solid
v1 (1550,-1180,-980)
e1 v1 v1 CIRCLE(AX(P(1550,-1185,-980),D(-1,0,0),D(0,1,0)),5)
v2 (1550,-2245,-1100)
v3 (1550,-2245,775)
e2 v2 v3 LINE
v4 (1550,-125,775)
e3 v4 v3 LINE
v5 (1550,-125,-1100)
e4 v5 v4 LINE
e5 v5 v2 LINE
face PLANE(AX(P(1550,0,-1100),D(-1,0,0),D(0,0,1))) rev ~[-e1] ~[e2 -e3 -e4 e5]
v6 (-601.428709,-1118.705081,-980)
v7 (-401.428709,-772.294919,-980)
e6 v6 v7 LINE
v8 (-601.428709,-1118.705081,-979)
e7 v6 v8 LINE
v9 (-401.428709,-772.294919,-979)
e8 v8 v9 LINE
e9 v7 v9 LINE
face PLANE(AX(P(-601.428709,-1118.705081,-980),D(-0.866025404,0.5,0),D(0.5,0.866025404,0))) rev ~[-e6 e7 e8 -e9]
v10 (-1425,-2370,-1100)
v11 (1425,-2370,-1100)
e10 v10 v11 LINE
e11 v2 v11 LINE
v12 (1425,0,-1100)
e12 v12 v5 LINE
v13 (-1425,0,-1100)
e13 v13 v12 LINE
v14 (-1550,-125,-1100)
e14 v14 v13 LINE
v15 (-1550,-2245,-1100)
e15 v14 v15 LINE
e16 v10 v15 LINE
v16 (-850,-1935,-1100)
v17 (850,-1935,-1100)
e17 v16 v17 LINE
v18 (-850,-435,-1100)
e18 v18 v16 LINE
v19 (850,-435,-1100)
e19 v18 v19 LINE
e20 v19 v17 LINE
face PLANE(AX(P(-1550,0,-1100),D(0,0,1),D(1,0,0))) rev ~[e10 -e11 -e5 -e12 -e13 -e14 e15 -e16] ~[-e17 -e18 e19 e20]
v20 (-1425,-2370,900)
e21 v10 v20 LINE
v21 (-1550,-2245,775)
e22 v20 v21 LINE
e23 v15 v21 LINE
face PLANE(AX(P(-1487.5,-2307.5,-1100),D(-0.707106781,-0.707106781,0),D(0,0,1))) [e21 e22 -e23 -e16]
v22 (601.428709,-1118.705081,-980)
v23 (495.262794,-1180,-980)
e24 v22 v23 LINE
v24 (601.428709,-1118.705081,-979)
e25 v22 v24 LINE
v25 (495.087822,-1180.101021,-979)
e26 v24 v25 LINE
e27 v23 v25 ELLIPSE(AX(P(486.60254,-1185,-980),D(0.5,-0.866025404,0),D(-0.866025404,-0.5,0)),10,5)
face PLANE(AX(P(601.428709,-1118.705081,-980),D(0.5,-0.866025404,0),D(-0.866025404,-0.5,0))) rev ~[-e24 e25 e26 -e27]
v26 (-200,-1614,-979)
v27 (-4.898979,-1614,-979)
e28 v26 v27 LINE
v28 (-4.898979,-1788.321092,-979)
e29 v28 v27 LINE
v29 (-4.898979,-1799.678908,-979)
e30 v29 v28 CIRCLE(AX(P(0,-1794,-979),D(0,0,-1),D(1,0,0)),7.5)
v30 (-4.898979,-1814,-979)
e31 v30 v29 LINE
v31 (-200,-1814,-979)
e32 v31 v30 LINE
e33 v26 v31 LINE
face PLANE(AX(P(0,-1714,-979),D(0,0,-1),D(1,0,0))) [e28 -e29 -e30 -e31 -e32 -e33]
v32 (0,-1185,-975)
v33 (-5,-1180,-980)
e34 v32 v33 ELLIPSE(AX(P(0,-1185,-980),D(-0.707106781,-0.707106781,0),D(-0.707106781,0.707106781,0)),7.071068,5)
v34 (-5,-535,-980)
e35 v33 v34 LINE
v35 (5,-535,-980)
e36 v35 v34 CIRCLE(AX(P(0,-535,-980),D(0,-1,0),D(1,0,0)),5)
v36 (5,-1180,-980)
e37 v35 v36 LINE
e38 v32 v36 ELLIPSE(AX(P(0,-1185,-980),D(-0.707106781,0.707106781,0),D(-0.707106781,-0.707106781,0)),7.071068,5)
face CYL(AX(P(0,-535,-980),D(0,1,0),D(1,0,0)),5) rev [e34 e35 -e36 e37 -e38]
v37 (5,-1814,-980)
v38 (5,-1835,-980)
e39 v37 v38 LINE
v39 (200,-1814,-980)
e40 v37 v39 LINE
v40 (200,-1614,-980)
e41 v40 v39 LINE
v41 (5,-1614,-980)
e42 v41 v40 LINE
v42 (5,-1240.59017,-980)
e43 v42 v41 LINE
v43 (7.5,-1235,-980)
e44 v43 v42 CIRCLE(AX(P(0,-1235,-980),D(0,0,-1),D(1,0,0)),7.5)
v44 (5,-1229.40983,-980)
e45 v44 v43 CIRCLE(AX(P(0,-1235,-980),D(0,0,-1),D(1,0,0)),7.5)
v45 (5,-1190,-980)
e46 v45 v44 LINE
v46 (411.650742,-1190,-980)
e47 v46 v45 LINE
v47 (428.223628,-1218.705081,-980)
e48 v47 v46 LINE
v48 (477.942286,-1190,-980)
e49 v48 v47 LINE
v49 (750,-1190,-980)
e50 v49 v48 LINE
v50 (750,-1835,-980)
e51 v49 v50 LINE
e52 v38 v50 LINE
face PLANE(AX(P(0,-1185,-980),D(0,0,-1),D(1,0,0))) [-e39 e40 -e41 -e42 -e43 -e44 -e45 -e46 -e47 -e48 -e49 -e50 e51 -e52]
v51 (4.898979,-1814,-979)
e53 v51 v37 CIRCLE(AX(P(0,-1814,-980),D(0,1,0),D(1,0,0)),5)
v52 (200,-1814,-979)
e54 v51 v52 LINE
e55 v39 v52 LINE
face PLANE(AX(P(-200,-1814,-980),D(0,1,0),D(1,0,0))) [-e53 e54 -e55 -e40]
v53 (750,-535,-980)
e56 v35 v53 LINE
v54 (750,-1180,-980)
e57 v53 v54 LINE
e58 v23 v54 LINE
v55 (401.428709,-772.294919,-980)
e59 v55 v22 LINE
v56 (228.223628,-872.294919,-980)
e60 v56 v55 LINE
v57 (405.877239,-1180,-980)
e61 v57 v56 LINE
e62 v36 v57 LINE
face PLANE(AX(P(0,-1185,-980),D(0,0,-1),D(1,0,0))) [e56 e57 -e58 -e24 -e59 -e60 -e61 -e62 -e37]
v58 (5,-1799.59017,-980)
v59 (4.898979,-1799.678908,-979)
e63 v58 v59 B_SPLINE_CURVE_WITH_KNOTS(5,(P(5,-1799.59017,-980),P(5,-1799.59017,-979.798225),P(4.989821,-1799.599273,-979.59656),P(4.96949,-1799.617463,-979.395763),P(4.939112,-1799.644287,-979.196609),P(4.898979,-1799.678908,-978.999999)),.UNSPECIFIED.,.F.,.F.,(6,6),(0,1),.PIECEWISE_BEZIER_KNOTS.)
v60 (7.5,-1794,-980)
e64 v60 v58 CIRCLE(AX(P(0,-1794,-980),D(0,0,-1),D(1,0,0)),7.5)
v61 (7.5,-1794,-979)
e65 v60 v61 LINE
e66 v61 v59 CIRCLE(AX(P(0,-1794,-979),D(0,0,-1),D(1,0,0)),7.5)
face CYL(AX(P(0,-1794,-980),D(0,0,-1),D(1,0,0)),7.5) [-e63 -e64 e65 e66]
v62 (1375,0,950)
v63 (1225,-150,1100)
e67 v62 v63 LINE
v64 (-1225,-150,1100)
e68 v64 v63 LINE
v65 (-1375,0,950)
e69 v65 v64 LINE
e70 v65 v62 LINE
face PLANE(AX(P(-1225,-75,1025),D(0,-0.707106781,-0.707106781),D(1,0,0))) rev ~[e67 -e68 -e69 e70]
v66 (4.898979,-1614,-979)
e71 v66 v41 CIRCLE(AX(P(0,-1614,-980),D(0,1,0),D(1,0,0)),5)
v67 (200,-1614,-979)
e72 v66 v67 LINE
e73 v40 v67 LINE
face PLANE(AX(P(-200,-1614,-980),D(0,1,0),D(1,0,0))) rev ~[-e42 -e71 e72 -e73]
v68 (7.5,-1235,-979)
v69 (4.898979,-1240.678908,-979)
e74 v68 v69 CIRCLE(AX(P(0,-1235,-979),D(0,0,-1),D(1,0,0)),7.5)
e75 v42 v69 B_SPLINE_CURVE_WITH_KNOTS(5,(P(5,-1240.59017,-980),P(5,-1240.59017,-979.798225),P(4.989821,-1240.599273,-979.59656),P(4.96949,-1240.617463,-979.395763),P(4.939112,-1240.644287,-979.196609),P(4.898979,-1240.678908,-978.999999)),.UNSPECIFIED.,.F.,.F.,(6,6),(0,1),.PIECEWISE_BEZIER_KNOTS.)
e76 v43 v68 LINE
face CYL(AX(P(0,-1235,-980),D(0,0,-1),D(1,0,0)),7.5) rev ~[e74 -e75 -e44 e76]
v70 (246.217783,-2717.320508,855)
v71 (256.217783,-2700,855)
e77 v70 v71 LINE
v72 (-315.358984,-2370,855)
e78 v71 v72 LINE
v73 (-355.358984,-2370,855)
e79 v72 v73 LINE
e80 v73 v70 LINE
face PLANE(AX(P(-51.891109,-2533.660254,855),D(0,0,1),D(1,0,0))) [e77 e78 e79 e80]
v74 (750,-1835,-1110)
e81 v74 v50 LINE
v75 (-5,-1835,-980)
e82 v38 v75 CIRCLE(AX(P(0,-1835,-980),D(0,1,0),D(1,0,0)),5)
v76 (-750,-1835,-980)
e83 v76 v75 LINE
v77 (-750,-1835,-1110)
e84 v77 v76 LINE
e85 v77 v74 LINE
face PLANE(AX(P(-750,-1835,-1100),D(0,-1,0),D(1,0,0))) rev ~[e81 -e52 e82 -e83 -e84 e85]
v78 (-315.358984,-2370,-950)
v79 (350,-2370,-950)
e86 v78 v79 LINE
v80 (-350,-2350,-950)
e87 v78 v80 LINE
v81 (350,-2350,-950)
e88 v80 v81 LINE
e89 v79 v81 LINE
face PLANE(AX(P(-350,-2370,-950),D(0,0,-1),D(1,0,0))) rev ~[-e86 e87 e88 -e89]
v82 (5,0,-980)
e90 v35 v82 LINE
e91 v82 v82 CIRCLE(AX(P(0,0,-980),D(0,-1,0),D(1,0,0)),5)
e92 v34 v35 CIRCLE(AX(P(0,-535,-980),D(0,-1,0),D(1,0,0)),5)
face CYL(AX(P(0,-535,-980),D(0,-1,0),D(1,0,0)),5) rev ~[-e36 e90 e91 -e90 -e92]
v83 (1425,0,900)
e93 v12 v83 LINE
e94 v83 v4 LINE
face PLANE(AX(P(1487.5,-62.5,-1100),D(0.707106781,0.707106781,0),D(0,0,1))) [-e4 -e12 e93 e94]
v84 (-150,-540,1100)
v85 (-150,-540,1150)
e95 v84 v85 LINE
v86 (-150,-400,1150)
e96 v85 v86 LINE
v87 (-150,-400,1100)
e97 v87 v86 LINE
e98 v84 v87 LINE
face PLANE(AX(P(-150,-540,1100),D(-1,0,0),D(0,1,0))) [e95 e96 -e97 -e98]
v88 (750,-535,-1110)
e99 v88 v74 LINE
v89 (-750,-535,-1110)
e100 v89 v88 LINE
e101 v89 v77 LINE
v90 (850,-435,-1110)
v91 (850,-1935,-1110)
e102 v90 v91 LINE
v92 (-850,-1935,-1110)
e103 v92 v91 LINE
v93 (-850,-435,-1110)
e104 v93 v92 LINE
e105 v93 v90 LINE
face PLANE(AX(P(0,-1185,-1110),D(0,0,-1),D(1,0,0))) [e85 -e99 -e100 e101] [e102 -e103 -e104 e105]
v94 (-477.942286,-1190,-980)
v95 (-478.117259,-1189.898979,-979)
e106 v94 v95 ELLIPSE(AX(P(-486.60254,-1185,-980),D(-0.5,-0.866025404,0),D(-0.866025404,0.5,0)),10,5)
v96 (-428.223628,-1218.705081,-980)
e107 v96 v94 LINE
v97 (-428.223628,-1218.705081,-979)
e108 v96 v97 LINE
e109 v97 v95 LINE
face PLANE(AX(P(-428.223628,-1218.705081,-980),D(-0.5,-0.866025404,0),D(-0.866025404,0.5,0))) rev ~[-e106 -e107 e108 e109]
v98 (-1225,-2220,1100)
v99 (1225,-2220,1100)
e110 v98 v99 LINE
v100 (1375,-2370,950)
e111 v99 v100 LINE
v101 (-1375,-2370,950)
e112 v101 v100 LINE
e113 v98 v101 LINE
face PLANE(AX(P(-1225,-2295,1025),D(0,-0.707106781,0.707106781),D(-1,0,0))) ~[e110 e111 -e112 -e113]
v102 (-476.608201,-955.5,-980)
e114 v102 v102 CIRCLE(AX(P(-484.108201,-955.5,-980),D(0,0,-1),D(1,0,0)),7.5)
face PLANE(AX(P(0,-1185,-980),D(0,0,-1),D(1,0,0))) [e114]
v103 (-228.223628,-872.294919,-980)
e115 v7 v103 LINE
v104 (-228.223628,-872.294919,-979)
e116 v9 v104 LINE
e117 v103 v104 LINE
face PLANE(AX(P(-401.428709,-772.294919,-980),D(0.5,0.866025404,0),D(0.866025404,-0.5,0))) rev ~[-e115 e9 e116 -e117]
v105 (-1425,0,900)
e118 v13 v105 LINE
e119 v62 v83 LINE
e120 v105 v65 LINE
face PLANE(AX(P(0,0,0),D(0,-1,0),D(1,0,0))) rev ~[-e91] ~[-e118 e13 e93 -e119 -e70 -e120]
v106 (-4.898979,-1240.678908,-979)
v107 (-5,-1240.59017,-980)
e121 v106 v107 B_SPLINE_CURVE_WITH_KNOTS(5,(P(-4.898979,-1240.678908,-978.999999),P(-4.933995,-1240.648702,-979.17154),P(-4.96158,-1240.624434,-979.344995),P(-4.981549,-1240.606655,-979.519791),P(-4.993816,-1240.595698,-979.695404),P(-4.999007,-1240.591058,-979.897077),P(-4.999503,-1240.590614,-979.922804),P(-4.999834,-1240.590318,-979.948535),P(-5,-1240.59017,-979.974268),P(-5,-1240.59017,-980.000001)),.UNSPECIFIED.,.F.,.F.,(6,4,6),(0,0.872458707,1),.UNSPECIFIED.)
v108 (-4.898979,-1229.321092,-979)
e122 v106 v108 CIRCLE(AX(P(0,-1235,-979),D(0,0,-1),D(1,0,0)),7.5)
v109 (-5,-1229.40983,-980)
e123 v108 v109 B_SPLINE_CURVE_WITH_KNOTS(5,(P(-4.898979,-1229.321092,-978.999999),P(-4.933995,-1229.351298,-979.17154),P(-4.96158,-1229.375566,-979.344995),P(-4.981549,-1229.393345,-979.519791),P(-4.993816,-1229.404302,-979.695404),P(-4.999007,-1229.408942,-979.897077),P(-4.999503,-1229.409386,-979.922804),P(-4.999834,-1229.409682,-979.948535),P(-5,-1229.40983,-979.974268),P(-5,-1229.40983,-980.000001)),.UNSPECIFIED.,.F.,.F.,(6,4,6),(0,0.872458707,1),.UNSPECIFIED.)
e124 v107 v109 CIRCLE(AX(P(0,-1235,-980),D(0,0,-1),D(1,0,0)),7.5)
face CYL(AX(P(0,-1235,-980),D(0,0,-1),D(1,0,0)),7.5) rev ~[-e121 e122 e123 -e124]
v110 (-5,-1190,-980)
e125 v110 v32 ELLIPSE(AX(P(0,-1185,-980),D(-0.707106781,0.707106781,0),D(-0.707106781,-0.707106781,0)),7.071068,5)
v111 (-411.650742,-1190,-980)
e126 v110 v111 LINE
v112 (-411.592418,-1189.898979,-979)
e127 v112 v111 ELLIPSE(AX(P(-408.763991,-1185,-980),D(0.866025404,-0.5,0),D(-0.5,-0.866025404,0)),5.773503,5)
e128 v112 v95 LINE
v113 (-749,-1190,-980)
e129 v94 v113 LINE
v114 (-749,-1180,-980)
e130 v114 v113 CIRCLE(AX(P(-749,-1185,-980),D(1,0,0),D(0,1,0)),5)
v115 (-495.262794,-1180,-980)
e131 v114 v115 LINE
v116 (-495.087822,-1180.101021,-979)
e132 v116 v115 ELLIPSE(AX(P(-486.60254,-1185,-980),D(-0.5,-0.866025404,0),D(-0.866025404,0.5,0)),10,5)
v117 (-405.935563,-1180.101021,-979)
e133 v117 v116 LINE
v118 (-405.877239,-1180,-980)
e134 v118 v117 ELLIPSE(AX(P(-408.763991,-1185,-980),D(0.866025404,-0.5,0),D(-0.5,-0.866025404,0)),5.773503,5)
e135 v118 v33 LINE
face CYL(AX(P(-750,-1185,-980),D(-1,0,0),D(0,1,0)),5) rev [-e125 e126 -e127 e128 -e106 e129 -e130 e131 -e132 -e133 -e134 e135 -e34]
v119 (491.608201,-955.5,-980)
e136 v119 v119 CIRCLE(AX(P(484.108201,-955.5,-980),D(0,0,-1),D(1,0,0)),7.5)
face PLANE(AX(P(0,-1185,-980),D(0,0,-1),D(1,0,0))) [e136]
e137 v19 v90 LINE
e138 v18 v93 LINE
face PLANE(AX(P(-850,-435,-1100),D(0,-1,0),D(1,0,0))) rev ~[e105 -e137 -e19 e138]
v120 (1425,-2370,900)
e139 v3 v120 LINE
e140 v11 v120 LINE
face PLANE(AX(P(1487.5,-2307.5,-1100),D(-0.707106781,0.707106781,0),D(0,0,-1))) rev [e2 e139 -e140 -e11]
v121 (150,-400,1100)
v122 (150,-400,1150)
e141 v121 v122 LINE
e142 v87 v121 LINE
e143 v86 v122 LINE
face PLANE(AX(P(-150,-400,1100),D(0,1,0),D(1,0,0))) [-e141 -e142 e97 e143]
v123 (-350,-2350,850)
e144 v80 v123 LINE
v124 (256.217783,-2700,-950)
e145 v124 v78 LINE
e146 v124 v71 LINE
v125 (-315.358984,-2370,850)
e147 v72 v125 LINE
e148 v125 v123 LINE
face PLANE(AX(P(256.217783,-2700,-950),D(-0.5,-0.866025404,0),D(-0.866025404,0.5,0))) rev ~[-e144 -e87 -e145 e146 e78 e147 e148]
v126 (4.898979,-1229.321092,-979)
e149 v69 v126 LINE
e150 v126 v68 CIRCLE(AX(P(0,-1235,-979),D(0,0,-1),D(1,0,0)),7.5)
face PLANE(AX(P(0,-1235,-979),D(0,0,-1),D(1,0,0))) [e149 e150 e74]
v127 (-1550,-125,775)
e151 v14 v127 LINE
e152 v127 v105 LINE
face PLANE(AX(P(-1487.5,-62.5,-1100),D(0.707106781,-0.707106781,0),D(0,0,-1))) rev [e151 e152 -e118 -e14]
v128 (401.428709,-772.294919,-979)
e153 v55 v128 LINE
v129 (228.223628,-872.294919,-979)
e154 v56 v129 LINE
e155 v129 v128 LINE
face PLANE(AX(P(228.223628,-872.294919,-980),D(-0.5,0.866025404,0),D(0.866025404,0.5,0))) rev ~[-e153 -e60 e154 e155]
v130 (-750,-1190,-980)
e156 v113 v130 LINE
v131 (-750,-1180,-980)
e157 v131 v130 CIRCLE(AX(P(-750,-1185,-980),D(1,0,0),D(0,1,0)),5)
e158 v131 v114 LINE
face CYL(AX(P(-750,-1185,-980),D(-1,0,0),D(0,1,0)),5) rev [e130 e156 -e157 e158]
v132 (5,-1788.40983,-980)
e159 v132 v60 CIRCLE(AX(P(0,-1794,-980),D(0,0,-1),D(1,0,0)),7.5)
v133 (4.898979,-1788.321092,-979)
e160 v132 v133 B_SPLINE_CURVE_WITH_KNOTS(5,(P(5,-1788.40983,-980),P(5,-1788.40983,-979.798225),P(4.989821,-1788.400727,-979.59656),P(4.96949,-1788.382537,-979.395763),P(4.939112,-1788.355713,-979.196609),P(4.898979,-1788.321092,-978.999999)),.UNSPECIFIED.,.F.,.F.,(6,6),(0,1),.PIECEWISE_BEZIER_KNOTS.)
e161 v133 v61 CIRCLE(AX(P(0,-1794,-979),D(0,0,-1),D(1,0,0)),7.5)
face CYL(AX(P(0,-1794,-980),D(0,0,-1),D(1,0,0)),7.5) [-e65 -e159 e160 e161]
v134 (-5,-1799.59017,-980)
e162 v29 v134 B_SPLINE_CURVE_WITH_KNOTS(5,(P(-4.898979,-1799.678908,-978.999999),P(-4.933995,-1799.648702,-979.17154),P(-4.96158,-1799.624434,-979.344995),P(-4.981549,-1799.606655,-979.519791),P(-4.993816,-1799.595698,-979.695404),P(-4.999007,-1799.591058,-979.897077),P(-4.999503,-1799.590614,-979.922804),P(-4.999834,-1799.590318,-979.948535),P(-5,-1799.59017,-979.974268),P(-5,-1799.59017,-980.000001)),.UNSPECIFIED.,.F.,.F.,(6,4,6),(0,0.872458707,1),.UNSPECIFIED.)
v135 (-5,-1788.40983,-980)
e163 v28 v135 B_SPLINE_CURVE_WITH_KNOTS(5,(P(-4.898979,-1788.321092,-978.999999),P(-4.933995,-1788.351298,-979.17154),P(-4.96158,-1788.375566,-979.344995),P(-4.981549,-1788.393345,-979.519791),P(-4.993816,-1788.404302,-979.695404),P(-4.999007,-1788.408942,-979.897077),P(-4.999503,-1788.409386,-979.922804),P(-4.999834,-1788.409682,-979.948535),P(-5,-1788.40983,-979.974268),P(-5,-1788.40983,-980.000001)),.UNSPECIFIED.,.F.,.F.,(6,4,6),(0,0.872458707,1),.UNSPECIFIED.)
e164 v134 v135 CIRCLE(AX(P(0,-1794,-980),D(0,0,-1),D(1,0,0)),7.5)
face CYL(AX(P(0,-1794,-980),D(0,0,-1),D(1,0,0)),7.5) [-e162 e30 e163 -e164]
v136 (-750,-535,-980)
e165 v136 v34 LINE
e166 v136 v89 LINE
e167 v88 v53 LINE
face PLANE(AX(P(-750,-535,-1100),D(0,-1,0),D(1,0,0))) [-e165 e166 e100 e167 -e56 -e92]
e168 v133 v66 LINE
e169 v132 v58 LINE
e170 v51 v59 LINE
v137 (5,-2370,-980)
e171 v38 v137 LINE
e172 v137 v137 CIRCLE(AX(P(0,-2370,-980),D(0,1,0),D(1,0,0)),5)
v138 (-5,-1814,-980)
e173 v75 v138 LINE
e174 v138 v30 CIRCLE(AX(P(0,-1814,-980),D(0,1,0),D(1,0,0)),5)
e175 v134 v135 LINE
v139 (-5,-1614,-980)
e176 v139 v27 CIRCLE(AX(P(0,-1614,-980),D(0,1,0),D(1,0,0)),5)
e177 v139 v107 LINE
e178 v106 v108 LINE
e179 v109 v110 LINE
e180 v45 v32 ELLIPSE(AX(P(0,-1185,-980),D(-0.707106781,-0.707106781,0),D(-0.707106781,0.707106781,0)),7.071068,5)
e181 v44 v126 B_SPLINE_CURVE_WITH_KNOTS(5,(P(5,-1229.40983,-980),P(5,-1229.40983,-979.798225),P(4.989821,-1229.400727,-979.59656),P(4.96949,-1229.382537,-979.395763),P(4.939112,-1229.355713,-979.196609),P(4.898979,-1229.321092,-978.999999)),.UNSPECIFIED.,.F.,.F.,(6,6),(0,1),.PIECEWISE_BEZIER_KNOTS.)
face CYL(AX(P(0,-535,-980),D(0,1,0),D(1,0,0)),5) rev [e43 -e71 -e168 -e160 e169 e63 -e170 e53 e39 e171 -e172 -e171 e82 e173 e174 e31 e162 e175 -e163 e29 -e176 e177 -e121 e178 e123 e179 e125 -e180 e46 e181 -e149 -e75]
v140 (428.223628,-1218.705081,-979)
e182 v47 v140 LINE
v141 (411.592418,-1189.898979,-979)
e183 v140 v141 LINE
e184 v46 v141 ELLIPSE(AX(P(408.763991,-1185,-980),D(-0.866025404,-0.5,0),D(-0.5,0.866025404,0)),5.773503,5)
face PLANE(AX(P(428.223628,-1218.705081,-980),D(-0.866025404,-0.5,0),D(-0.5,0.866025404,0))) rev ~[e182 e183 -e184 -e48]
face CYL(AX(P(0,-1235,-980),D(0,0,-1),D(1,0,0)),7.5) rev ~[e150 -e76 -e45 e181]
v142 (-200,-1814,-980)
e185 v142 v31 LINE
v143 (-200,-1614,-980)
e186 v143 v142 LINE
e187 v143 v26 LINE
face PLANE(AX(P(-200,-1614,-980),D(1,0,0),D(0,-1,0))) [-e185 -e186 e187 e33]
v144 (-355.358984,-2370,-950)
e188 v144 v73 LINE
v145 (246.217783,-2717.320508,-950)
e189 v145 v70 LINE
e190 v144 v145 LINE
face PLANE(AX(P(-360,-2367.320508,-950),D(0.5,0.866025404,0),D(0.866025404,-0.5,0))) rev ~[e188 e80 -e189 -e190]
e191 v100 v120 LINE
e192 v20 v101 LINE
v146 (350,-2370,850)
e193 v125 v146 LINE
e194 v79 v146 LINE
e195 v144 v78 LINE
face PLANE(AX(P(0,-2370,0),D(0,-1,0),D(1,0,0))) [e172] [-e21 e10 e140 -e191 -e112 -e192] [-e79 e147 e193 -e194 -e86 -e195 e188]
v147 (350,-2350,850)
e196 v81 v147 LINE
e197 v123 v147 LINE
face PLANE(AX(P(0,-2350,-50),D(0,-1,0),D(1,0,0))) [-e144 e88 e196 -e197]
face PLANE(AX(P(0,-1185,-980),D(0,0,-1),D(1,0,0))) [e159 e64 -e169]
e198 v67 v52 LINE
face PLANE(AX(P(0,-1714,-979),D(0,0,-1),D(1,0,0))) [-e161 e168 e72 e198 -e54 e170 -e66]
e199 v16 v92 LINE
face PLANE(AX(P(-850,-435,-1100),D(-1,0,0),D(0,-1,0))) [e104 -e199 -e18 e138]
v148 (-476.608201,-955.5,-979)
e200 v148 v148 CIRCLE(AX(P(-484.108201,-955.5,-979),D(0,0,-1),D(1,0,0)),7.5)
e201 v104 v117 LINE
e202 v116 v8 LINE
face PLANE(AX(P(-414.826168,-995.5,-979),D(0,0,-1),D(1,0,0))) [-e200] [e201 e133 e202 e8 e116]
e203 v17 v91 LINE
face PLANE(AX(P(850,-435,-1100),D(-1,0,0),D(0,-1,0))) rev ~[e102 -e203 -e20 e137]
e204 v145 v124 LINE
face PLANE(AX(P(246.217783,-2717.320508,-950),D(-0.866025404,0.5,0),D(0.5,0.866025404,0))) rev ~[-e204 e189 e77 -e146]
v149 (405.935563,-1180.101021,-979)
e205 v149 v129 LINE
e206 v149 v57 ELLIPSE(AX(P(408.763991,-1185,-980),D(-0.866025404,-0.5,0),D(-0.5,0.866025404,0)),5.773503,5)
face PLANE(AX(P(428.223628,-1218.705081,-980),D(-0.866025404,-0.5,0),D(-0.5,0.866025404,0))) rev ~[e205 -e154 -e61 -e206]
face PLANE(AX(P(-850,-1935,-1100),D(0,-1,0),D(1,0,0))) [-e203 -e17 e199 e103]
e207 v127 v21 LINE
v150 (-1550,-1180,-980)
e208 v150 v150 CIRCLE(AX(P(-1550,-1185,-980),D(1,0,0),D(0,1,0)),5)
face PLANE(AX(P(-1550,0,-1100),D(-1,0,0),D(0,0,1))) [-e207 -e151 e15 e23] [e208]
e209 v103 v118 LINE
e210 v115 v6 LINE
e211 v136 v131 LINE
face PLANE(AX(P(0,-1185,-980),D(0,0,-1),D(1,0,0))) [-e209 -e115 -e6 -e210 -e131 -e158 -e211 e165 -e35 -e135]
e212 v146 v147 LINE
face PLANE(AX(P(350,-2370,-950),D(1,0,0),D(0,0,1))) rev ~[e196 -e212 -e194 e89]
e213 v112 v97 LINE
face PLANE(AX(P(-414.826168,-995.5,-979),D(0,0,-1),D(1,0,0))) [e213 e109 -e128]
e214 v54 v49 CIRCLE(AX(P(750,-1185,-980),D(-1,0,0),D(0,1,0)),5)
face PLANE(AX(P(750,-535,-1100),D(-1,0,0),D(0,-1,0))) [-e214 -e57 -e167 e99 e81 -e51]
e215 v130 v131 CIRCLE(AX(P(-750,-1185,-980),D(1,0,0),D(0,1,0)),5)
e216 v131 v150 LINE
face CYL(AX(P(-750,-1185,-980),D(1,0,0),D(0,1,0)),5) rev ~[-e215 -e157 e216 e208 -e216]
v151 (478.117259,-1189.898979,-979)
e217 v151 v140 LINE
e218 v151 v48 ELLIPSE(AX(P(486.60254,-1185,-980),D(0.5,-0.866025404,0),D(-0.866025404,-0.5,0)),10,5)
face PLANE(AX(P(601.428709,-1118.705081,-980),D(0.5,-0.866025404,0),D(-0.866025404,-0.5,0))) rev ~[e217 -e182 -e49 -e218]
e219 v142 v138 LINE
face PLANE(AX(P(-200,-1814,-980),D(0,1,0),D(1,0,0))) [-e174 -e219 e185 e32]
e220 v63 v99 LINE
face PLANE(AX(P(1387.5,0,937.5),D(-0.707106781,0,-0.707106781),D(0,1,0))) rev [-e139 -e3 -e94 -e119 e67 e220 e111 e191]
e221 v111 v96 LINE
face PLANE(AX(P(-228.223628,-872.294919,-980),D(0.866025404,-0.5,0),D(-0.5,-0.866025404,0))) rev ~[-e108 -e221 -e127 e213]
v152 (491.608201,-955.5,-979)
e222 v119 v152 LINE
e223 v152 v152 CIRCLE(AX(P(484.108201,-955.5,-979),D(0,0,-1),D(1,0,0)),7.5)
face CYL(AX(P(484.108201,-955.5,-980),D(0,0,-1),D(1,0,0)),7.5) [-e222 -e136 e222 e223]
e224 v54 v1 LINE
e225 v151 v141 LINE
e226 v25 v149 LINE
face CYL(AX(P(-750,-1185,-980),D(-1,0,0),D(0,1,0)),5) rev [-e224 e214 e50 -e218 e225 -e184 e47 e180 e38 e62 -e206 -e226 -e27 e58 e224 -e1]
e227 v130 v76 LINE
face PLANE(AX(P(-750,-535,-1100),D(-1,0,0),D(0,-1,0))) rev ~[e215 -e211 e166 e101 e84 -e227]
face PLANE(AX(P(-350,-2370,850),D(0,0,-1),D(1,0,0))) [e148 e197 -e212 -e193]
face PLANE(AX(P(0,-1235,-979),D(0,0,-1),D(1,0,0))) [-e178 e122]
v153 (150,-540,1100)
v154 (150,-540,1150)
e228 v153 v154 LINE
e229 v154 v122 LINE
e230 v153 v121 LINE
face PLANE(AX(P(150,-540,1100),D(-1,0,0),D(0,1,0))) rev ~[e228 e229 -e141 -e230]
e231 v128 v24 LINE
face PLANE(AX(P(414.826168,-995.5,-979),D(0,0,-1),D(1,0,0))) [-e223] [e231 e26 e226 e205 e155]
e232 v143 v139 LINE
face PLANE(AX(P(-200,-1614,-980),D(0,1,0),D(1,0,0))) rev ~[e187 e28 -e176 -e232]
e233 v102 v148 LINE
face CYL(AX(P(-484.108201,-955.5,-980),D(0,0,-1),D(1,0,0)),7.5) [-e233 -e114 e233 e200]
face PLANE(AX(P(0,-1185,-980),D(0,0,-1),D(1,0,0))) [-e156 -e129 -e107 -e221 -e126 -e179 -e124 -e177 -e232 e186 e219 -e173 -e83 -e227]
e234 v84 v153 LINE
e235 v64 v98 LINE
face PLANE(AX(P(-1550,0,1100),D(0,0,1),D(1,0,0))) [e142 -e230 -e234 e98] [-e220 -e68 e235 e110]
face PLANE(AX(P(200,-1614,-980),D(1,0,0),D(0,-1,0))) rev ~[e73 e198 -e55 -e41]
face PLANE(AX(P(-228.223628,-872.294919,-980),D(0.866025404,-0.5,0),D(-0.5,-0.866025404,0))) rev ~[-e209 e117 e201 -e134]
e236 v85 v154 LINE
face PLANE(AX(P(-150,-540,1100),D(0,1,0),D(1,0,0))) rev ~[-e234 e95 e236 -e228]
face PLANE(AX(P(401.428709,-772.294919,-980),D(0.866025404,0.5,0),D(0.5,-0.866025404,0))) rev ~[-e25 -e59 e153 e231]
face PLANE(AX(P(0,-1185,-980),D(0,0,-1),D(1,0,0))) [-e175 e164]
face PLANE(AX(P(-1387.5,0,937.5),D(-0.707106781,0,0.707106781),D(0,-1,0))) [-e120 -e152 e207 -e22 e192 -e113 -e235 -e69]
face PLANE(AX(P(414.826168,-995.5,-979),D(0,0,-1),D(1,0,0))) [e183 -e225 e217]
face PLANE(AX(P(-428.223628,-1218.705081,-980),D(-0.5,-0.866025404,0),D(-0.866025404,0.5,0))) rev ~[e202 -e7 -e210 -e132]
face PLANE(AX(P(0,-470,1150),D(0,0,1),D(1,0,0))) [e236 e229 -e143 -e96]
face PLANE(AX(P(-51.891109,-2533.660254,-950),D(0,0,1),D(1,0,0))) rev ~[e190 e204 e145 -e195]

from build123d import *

# Parameters (mm, degrees)
F0_W           = 3100
F0_H           = 2200
F1_DEPTH       = 2370
F2_SIZE        = 325
F3_SIZE        = 325
F4_SIZE        = 125
F5_SIZE        = 125
F6_SIZE        = 125
F7_SIZE        = 125
F8_W           = 1500
F8_H           = 1300
F9_DEPTH       = 120
F10_W          = 400
F10_H          = 200
F10_R          = 7.5
F11_DEPTH      = 1
F12_R          = 5
F13_DEPTH      = 1
F14_DEPTH      = 800.001
F14_DEPTH_BACK = 2300.001
F15_R          = 5
F16_DEPTH      = 535.001
F16_DEPTH_BACK = 1835.001
F17_SIZE       = 150
F18_SIZE       = 150
F19_W          = 1700
F19_H          = 1500
F19_W_2        = 1500
F19_H_2        = 1300
F20_DEPTH      = 10
F21_W          = 700
F21_H          = 1800
F22_DEPTH      = 20
F23_W          = 300
F23_H          = 140
F24_DEPTH      = 50
F26_DEPTH      = 1805


# Not quite as in the source:
# - a feature of the source that left no trace in its solid (it failed there, or was rolled back) is left out


with BuildPart() as f1:
    # F0 (on Front) → F1 (new body)
    with BuildSketch(Plane.XZ):
        Rectangle(F0_W, F0_H)
    extrude(amount=F1_DEPTH)

    # F2
    f2_edges = [f1.edges().sort_by_distance(p)[0] for p in [
        (-1550, -1185, 1100),
    ]]
    chamfer(f2_edges, length=F2_SIZE)

    # F3
    f3_edges = [f1.edges().sort_by_distance(p)[0] for p in [
        (1550, -1185, 1100),
    ]]
    chamfer(f3_edges, length=F3_SIZE)

    # F4
    f4_edges = [f1.edges().sort_by_distance(p)[0] for p in [
        (1550, -2370, -162.5),
    ]]
    chamfer(f4_edges, length=F4_SIZE)

    # F5
    f5_edges = [f1.edges().sort_by_distance(p)[0] for p in [
        (-1550, -2370, -162.5),
    ]]
    chamfer(f5_edges, length=F5_SIZE)

    # F6
    f6_edges = [f1.edges().sort_by_distance(p)[0] for p in [
        (-1550, 0, -162.5),
    ]]
    chamfer(f6_edges, length=F6_SIZE)

    # F7
    f7_edges = [f1.edges().sort_by_distance(p)[0] for p in [
        (1550, 0, -162.5),
    ]]
    chamfer(f7_edges, length=F7_SIZE)

    # F8 (on face) → F9 (cut)
    with BuildSketch(Plane(origin=(0, 0, -1100), x_dir=(1, 0, 0), z_dir=(0, 0, -1))):
        with Locations((0, 1185)):
            Rectangle(F8_W, F8_H)
    extrude(amount=-F9_DEPTH, mode=Mode.SUBTRACT)

    # F10 (on face) → F11 (cut)
    with BuildSketch(Plane(origin=(0, 0, -980), x_dir=(1, 0, 0), z_dir=(0, 0, -1))):
        with Locations((0, 1714)):
            Rectangle(F10_W, F10_H)
        with Locations((0, 1794)):
            Circle(F10_R, mode=Mode.SUBTRACT)
        Polygon((601.4287087912, 1118.7050807569), (428.2236280343, 1218.7050807569), (228.2236280343, 872.2949192431), (401.4287087912, 772.2949192431), align=None)
        with Locations((484.1082007155, 955.5)):
            Circle(F10_R, mode=Mode.SUBTRACT)
        Polygon((-228.2236280343, 872.2949192431), (-428.2236280343, 1218.7050807569), (-601.4287087912, 1118.7050807569), (-401.4287087912, 772.2949192431), align=None)
        with Locations((-484.1082007155, 955.5)):
            Circle(F10_R, mode=Mode.SUBTRACT)
        with Locations((0, 1235)):
            Circle(F10_R)
    extrude(amount=-F11_DEPTH, mode=Mode.SUBTRACT)

    # F12 (on face) → F13 (cut)
    with BuildSketch(Plane.YZ.offset(-750)):
        with Locations((-1185, -980)):
            Circle(F12_R)
    extrude(amount=F13_DEPTH, mode=Mode.SUBTRACT)

    # F12 (on face) → F14 (cut, two sides)
    with BuildSketch(Plane.YZ.offset(-750)) as f14_sk:
        with Locations((-1185, -980)):
            Circle(F12_R)
    extrude(amount=-F14_DEPTH, mode=Mode.SUBTRACT)
    extrude(f14_sk.sketch, amount=F14_DEPTH_BACK, mode=Mode.SUBTRACT)

    # F15 (on face) → F16 (cut, two sides)
    with BuildSketch(Plane.XZ.offset(535)) as f16_sk:
        with Locations((0, -980)):
            Circle(F15_R)
    extrude(amount=-F16_DEPTH, mode=Mode.SUBTRACT)
    extrude(f16_sk.sketch, amount=F16_DEPTH_BACK, mode=Mode.SUBTRACT)

    # F17
    f17_edges = [f1.edges().sort_by_distance(p)[0] for p in [
        (0, 0, 1100),
    ]]
    chamfer(f17_edges, length=F17_SIZE)

    # F18
    f18_edges = [f1.edges().sort_by_distance(p)[0] for p in [
        (0, -2370, 1100),
    ]]
    chamfer(f18_edges, length=F18_SIZE)

    # F19 (on face) → F20 (join)
    with BuildSketch(Plane(origin=(0, 0, -1100), x_dir=(1, 0, 0), z_dir=(0, 0, -1))):
        with Locations((0, 1185)):
            Rectangle(F19_W, F19_H)
        with Locations((0, 1185)):
            Rectangle(F19_W_2, F19_H_2, mode=Mode.SUBTRACT)
    extrude(amount=F20_DEPTH)

    # F21 (on face) → F22 (cut)
    with BuildSketch(Plane.XZ.offset(2370)):
        with Locations((0, -50)):
            Rectangle(F21_W, F21_H)
    extrude(amount=-F22_DEPTH, mode=Mode.SUBTRACT)

    # F23 (on face) → F24 (join)
    with BuildSketch(Plane.XY.offset(1100)):
        with Locations((0, -470)):
            Rectangle(F23_W, F23_H)
    extrude(amount=F24_DEPTH)

    # F25 (on face) → F26 (join)
    with BuildSketch(Plane.XY.offset(-950)):
        Polygon((-350, -2350), (-360, -2367.3205080757), (246.2177826491, -2717.3205080757), (256.2177826491, -2700), align=None)
    extrude(amount=F26_DEPTH)


solid = f1.part
